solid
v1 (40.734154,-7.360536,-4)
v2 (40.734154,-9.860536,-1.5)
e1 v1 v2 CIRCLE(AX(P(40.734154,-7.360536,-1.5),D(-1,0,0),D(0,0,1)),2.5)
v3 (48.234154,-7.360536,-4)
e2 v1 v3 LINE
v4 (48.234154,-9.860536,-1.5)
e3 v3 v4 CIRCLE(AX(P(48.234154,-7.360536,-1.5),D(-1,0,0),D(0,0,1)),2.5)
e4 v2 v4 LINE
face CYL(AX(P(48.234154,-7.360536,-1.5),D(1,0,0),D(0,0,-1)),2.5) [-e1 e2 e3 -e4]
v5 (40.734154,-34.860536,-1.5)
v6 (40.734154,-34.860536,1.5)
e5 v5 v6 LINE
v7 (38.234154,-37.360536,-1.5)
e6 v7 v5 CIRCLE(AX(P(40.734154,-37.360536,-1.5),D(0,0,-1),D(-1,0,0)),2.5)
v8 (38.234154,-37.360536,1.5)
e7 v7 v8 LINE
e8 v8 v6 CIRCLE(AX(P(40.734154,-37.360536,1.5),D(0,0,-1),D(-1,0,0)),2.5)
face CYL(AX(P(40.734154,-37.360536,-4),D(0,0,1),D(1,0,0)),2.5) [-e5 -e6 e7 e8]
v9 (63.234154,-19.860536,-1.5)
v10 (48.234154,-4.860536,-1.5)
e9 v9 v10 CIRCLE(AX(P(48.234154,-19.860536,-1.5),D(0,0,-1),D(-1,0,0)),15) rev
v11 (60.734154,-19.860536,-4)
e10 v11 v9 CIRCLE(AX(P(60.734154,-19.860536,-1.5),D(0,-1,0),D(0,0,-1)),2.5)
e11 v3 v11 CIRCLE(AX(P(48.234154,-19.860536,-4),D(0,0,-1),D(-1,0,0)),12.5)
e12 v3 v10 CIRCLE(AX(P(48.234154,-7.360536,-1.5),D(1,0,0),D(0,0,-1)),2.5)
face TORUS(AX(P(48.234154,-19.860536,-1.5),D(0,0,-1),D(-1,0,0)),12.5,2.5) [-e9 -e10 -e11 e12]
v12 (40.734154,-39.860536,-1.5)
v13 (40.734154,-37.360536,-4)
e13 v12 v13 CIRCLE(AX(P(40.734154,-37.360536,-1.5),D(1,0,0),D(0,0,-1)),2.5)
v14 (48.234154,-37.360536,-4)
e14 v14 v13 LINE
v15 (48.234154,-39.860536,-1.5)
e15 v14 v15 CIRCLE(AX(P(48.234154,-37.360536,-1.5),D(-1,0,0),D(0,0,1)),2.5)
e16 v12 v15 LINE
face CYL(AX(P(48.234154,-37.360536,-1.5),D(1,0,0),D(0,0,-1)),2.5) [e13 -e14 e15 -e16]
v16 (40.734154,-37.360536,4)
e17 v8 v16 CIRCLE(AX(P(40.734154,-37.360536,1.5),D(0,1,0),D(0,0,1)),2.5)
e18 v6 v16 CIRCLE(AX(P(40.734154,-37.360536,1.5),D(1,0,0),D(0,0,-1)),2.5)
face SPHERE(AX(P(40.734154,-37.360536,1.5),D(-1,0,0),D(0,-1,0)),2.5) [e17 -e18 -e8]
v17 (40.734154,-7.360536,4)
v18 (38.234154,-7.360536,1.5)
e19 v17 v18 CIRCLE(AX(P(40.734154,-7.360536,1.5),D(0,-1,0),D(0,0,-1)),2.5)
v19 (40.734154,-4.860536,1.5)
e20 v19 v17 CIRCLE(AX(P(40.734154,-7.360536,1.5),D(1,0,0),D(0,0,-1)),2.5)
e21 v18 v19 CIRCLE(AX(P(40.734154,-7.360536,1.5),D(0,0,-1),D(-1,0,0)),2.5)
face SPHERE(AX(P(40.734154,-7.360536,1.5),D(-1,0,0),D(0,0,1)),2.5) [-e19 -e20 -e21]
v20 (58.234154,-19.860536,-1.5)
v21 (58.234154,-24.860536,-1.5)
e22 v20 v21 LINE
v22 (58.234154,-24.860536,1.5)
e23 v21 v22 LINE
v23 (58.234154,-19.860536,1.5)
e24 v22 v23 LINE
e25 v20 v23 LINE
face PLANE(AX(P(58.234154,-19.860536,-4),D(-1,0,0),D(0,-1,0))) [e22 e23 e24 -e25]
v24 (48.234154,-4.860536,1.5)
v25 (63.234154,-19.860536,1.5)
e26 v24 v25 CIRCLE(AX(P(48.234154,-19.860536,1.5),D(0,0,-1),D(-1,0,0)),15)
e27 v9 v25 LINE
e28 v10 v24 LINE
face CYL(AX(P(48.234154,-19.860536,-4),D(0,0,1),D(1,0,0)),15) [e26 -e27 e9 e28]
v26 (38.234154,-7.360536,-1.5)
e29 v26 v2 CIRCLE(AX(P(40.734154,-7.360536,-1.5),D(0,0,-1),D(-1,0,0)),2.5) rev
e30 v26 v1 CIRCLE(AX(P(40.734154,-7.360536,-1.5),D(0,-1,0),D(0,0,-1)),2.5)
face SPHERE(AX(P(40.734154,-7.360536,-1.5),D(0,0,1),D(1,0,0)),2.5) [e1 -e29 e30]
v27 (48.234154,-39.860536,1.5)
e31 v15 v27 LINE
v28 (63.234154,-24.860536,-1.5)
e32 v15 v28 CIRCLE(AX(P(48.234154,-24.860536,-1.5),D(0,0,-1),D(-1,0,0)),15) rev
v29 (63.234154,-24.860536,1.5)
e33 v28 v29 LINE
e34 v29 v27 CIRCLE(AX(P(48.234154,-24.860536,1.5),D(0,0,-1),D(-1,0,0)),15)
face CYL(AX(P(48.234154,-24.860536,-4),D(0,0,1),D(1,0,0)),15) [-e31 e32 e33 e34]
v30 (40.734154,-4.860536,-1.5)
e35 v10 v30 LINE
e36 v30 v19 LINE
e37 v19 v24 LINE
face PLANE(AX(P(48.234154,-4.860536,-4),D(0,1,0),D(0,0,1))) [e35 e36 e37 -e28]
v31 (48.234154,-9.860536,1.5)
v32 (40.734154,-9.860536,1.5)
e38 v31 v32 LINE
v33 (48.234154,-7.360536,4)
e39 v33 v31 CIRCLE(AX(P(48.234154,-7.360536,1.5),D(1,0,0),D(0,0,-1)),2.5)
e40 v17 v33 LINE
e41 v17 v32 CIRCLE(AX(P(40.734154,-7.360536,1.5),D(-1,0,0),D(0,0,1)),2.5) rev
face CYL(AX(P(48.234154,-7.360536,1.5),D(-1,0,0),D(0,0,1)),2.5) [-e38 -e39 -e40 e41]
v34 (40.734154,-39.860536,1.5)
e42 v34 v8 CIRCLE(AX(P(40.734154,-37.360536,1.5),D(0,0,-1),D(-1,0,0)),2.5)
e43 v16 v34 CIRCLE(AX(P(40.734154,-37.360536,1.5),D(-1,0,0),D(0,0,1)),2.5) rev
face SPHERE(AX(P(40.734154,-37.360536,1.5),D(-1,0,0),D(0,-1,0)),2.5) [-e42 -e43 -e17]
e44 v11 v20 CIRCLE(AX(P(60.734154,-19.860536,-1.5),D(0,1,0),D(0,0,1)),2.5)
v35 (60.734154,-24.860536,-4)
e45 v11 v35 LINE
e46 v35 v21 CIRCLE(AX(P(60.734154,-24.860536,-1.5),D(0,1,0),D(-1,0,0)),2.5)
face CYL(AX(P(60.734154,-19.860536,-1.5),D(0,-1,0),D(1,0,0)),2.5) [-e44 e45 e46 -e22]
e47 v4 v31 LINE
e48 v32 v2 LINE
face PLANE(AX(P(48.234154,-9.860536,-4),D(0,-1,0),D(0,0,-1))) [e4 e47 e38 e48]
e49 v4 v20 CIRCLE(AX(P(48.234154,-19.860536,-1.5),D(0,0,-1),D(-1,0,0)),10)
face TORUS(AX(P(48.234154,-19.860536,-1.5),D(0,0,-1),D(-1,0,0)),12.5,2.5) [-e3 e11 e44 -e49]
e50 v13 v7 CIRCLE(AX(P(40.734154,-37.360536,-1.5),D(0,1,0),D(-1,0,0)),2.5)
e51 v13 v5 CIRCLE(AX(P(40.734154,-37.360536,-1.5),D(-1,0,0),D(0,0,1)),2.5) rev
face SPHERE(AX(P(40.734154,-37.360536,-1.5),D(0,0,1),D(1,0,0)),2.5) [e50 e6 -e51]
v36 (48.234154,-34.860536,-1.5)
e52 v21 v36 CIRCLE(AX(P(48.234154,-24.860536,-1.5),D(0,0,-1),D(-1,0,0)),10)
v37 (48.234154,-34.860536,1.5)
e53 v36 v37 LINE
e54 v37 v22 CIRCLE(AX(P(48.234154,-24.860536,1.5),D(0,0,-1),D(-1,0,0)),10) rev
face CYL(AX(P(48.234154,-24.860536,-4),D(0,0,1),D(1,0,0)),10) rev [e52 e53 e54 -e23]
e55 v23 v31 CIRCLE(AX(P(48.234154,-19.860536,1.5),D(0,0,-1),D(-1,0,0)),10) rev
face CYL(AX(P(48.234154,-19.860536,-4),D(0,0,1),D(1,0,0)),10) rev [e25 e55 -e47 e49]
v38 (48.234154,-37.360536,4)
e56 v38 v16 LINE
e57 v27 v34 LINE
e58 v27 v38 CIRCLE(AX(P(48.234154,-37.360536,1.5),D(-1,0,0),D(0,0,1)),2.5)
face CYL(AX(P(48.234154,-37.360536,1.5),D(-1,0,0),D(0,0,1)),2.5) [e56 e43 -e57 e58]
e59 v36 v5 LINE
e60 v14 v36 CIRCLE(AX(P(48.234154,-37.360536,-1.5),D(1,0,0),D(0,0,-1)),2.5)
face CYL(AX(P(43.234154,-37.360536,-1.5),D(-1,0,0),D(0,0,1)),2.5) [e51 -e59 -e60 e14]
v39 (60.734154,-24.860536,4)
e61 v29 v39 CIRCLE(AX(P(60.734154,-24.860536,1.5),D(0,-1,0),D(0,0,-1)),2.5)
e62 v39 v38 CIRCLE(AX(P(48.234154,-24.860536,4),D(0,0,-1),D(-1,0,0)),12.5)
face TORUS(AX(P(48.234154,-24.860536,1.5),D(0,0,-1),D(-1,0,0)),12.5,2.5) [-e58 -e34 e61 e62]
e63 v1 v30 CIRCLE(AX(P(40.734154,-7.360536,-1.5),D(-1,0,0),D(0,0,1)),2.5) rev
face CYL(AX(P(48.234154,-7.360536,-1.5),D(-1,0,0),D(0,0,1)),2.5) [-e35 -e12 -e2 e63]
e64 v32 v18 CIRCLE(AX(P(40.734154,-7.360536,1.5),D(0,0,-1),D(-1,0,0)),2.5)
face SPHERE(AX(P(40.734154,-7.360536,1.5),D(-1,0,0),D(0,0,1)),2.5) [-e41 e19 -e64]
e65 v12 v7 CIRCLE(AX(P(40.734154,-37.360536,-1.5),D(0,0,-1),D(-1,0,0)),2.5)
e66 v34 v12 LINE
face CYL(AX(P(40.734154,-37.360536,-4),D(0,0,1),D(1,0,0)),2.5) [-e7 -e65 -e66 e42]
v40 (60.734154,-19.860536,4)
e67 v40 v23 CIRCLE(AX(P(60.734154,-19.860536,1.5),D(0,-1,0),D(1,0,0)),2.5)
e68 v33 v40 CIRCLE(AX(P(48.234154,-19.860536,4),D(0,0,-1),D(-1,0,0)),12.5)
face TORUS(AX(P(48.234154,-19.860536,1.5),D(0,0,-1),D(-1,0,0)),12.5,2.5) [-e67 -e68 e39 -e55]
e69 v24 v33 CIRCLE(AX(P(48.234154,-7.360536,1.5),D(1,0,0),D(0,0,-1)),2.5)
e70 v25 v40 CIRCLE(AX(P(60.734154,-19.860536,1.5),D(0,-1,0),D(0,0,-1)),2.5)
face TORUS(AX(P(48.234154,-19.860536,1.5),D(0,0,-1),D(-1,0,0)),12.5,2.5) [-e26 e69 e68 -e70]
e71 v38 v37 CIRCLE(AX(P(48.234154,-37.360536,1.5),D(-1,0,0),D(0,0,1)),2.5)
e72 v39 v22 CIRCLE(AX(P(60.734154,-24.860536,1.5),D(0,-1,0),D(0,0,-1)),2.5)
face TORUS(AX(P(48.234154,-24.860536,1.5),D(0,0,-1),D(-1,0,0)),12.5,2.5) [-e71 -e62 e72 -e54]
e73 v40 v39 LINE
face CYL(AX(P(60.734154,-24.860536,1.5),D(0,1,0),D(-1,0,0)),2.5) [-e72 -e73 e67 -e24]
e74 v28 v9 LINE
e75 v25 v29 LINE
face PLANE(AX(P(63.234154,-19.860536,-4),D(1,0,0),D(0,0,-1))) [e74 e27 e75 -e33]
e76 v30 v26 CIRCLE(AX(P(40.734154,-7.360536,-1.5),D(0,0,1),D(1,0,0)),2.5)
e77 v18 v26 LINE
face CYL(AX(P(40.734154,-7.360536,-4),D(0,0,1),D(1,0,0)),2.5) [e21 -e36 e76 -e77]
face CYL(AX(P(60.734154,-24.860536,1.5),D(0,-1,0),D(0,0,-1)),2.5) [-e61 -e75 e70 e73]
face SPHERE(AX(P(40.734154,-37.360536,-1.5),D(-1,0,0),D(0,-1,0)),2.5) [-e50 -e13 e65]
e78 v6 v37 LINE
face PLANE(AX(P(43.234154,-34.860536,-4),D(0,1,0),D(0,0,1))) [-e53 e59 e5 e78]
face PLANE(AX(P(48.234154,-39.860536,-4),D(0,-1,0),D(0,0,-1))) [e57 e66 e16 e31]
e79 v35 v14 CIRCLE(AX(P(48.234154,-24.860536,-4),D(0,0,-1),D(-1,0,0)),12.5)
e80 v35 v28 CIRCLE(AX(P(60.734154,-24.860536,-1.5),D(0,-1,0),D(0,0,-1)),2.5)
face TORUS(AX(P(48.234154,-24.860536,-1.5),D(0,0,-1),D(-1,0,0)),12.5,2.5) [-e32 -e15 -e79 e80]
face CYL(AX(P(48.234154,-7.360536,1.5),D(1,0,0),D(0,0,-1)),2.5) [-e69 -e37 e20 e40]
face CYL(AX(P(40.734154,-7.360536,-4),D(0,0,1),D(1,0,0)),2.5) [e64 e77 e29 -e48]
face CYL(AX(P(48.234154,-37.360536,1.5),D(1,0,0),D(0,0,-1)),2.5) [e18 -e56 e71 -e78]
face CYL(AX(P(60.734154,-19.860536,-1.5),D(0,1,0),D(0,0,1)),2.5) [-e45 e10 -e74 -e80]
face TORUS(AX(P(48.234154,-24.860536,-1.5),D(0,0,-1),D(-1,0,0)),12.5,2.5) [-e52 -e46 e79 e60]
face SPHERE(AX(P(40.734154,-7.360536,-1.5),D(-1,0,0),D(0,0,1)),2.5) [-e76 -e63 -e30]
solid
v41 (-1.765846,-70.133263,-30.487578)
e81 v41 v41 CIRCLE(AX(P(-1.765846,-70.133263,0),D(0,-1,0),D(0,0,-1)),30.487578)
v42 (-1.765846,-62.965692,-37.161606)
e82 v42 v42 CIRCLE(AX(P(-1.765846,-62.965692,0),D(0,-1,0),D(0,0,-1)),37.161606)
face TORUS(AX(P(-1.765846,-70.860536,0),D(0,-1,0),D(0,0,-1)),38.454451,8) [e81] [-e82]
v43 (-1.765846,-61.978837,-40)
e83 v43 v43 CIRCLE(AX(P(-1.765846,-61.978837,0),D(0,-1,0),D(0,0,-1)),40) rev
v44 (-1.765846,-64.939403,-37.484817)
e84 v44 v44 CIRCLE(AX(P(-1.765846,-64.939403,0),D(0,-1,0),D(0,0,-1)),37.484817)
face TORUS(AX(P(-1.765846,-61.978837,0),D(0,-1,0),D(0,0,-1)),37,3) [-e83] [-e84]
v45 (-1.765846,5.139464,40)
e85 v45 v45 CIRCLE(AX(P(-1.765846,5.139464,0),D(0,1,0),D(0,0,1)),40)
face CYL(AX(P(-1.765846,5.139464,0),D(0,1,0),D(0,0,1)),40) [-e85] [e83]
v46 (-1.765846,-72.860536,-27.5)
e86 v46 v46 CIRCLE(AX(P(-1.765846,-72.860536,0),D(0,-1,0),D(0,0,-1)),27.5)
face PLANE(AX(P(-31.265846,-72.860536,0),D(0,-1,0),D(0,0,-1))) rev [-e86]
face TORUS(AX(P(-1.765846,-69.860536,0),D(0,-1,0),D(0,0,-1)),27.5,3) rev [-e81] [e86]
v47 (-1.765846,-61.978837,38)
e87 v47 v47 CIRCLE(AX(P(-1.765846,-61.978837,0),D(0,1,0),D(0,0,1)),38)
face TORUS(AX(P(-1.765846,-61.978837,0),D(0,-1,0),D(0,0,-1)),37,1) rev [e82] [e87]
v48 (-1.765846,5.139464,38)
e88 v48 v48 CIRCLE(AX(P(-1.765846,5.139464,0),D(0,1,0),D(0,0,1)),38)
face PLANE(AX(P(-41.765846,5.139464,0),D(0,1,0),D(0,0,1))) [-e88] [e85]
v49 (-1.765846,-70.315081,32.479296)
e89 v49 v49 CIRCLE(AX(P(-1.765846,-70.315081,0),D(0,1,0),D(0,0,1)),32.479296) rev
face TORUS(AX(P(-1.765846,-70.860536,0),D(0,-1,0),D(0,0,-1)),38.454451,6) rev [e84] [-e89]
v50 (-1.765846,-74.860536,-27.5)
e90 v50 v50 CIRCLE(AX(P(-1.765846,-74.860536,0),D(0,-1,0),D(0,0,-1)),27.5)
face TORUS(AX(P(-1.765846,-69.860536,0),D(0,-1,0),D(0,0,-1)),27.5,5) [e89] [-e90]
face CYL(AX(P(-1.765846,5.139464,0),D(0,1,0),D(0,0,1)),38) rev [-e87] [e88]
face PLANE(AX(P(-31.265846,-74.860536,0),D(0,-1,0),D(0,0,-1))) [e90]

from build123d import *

# Parameters (mm, degrees)
FILLET_1_R           = 5
FILLET_2_R           = 6
FILLET_4_R           = 3
SHELL_3_T            = -2
EXTRUDE_1_DEPTH      = 4
EXTRUDE_1_DEPTH_BACK = 4
FILLET_6_R           = 2.5
FILLET_7_R           = 2.5


with BuildPart() as part:
    # 스케치1 → 회전1 (revolve)
    with BuildSketch(Plane.XY, mode=Mode.PRIVATE) as revolve_1_sk:
        Polygon((-41.765846009, 5.139464258), (-1.765846009, 5.139464258), (-1.765846009, -74.860535742), (-31.265846009, -74.860535742), (-34.265846009, -74.860535742), (-34.265846009, -71.860535742), (-34.265846009, -70.860535742), (-34.265846009, -64.860535742), (-40.265846009, -64.860535742), (-41.765846009, -64.860535742), align=None)
    revolve(revolve_1_sk.sketch.rotate(Axis((-1.765846009, 5.139464258, 0), (0, -1, 0)), 270), axis=Axis((-1.765846009, 5.139464258, 0), (0, -1, 0)))

    # 필렛1
    fillet_1_edges = [part.edges().sort_by_distance(p)[0] for p in [
        (-1.765846009, -74.860535742, -32.5),
    ]]
    fillet(fillet_1_edges, radius=FILLET_1_R)

    # 필렛2
    fillet_2_edges = [part.edges().sort_by_distance(p)[0] for p in [
        (-1.765846009, -64.860535742, -32.5),
    ]]
    fillet(fillet_2_edges, radius=FILLET_2_R)

    # 필렛4
    fillet_4_edges = [part.edges().sort_by_distance(p)[0] for p in [
        (-1.765846009, -64.860535742, -40),
    ]]
    fillet(fillet_4_edges, radius=FILLET_4_R)

    # 쉘3
    shell_3_openings = [part.faces().sort_by_distance(p)[0] for p in [
        (-1.765846009, 5.139464258, 0),
    ]]
    offset(amount=SHELL_3_T, openings=shell_3_openings, kind=Kind.INTERSECTION)


with BuildPart() as body_2:
    # 스케치2 → 보스-돌출1 (new, two sides: drawn at the far end of the back side and taken through both)
    with BuildSketch(Plane.XY.offset(-EXTRUDE_1_DEPTH_BACK)):
        with BuildLine():
            Line((58.234153991, -19.860535742), (58.234153991, -24.860535742))
            ThreePointArc((58.234153991, -24.860535742), (55.305221803, -31.931603554), (48.234153991, -34.860535742))
            Line((48.234153991, -34.860535742), (43.234153991, -34.860535742))
            Line((43.234153991, -34.860535742), (38.234153991, -34.860535742))
            Line((38.234153991, -34.860535742), (38.234153991, -39.860535742))
            Line((38.234153991, -39.860535742), (48.234153991, -39.860535742))
            ThreePointArc((48.234153991, -39.860535742), (58.840755709, -35.46713746), (63.234153991, -24.860535742))
            Line((63.234153991, -24.860535742), (63.234153991, -19.860535742))
            ThreePointArc((63.234153991, -19.860535742), (58.840755709, -9.253934024), (48.234153991, -4.860535742))
            Line((48.234153991, -4.860535742), (38.234153991, -4.860535742))
            Line((38.234153991, -4.860535742), (38.234153991, -9.860535742))
            Line((38.234153991, -9.860535742), (43.234153991, -9.860535742))
            Line((43.234153991, -9.860535742), (48.234153991, -9.860535742))
            ThreePointArc((48.234153991, -9.860535742), (55.305221803, -12.78946793), (58.234153991, -19.860535742))
        make_face()
    extrude(amount=EXTRUDE_1_DEPTH + EXTRUDE_1_DEPTH_BACK)

    # 필렛6
    fillet_6_edges = [body_2.edges().sort_by_distance(p)[0] for p in [
        (43.234153991, -39.860535742, -4),
        (58.840755709, -35.46713746, -4),
        (63.234153991, -22.360535742, -4),
        (43.234153991, -4.860535742, -4),
        (43.234153991, -39.860535742, 4),
        (58.840755709, -35.46713746, 4),
        (63.234153991, -22.360535742, 4),
        (43.234153991, -4.860535742, 4),
        (43.234153991, -9.860535742, 4),
        (43.234153991, -34.860535742, 4),
        (55.305221803, -31.931603554, 4),
        (58.234153991, -22.360535742, 4),
        (58.840755709, -9.253934024, -4),
        (58.840755709, -9.253934024, 4),
        (55.305221803, -12.78946793, 4),
    ]]
    fillet(fillet_6_edges, radius=FILLET_6_R - 0.0001)  # a hair under: the kernel refuses the full size

    # 필렛7
    fillet_7_edges = [body_2.edges().sort_by_distance(p)[0] for p in [
        (38.234153991, -9.860535742, -1.24995),
        (38.234153991, -9.128331984, 3.267796242),
        (38.234153991, -5.5927395, 3.267796242),
        (38.234153991, -4.860535742, 0),
        (38.234153991, -5.5927395, -3.267796242),
        (38.234153991, -34.860535742, -1.24995),
        (38.234153991, -35.5927395, 3.267796242),
        (38.234153991, -39.128331984, 3.267796242),
        (38.234153991, -39.860535742, 0),
        (38.234153991, -39.128331984, -3.267796242),
        (43.234153991, -9.860535742, -4),
        (55.305221803, -12.78946793, -4),
        (58.234153991, -22.360535742, -4),
        (55.305221803, -31.931603554, -4),
        (43.234153991, -34.860535742, -4),
    ]]
    fillet(fillet_7_edges, radius=FILLET_7_R - 0.0001)  # a hair under: the kernel refuses the full size


solid = Compound([part.part, body_2.part])
